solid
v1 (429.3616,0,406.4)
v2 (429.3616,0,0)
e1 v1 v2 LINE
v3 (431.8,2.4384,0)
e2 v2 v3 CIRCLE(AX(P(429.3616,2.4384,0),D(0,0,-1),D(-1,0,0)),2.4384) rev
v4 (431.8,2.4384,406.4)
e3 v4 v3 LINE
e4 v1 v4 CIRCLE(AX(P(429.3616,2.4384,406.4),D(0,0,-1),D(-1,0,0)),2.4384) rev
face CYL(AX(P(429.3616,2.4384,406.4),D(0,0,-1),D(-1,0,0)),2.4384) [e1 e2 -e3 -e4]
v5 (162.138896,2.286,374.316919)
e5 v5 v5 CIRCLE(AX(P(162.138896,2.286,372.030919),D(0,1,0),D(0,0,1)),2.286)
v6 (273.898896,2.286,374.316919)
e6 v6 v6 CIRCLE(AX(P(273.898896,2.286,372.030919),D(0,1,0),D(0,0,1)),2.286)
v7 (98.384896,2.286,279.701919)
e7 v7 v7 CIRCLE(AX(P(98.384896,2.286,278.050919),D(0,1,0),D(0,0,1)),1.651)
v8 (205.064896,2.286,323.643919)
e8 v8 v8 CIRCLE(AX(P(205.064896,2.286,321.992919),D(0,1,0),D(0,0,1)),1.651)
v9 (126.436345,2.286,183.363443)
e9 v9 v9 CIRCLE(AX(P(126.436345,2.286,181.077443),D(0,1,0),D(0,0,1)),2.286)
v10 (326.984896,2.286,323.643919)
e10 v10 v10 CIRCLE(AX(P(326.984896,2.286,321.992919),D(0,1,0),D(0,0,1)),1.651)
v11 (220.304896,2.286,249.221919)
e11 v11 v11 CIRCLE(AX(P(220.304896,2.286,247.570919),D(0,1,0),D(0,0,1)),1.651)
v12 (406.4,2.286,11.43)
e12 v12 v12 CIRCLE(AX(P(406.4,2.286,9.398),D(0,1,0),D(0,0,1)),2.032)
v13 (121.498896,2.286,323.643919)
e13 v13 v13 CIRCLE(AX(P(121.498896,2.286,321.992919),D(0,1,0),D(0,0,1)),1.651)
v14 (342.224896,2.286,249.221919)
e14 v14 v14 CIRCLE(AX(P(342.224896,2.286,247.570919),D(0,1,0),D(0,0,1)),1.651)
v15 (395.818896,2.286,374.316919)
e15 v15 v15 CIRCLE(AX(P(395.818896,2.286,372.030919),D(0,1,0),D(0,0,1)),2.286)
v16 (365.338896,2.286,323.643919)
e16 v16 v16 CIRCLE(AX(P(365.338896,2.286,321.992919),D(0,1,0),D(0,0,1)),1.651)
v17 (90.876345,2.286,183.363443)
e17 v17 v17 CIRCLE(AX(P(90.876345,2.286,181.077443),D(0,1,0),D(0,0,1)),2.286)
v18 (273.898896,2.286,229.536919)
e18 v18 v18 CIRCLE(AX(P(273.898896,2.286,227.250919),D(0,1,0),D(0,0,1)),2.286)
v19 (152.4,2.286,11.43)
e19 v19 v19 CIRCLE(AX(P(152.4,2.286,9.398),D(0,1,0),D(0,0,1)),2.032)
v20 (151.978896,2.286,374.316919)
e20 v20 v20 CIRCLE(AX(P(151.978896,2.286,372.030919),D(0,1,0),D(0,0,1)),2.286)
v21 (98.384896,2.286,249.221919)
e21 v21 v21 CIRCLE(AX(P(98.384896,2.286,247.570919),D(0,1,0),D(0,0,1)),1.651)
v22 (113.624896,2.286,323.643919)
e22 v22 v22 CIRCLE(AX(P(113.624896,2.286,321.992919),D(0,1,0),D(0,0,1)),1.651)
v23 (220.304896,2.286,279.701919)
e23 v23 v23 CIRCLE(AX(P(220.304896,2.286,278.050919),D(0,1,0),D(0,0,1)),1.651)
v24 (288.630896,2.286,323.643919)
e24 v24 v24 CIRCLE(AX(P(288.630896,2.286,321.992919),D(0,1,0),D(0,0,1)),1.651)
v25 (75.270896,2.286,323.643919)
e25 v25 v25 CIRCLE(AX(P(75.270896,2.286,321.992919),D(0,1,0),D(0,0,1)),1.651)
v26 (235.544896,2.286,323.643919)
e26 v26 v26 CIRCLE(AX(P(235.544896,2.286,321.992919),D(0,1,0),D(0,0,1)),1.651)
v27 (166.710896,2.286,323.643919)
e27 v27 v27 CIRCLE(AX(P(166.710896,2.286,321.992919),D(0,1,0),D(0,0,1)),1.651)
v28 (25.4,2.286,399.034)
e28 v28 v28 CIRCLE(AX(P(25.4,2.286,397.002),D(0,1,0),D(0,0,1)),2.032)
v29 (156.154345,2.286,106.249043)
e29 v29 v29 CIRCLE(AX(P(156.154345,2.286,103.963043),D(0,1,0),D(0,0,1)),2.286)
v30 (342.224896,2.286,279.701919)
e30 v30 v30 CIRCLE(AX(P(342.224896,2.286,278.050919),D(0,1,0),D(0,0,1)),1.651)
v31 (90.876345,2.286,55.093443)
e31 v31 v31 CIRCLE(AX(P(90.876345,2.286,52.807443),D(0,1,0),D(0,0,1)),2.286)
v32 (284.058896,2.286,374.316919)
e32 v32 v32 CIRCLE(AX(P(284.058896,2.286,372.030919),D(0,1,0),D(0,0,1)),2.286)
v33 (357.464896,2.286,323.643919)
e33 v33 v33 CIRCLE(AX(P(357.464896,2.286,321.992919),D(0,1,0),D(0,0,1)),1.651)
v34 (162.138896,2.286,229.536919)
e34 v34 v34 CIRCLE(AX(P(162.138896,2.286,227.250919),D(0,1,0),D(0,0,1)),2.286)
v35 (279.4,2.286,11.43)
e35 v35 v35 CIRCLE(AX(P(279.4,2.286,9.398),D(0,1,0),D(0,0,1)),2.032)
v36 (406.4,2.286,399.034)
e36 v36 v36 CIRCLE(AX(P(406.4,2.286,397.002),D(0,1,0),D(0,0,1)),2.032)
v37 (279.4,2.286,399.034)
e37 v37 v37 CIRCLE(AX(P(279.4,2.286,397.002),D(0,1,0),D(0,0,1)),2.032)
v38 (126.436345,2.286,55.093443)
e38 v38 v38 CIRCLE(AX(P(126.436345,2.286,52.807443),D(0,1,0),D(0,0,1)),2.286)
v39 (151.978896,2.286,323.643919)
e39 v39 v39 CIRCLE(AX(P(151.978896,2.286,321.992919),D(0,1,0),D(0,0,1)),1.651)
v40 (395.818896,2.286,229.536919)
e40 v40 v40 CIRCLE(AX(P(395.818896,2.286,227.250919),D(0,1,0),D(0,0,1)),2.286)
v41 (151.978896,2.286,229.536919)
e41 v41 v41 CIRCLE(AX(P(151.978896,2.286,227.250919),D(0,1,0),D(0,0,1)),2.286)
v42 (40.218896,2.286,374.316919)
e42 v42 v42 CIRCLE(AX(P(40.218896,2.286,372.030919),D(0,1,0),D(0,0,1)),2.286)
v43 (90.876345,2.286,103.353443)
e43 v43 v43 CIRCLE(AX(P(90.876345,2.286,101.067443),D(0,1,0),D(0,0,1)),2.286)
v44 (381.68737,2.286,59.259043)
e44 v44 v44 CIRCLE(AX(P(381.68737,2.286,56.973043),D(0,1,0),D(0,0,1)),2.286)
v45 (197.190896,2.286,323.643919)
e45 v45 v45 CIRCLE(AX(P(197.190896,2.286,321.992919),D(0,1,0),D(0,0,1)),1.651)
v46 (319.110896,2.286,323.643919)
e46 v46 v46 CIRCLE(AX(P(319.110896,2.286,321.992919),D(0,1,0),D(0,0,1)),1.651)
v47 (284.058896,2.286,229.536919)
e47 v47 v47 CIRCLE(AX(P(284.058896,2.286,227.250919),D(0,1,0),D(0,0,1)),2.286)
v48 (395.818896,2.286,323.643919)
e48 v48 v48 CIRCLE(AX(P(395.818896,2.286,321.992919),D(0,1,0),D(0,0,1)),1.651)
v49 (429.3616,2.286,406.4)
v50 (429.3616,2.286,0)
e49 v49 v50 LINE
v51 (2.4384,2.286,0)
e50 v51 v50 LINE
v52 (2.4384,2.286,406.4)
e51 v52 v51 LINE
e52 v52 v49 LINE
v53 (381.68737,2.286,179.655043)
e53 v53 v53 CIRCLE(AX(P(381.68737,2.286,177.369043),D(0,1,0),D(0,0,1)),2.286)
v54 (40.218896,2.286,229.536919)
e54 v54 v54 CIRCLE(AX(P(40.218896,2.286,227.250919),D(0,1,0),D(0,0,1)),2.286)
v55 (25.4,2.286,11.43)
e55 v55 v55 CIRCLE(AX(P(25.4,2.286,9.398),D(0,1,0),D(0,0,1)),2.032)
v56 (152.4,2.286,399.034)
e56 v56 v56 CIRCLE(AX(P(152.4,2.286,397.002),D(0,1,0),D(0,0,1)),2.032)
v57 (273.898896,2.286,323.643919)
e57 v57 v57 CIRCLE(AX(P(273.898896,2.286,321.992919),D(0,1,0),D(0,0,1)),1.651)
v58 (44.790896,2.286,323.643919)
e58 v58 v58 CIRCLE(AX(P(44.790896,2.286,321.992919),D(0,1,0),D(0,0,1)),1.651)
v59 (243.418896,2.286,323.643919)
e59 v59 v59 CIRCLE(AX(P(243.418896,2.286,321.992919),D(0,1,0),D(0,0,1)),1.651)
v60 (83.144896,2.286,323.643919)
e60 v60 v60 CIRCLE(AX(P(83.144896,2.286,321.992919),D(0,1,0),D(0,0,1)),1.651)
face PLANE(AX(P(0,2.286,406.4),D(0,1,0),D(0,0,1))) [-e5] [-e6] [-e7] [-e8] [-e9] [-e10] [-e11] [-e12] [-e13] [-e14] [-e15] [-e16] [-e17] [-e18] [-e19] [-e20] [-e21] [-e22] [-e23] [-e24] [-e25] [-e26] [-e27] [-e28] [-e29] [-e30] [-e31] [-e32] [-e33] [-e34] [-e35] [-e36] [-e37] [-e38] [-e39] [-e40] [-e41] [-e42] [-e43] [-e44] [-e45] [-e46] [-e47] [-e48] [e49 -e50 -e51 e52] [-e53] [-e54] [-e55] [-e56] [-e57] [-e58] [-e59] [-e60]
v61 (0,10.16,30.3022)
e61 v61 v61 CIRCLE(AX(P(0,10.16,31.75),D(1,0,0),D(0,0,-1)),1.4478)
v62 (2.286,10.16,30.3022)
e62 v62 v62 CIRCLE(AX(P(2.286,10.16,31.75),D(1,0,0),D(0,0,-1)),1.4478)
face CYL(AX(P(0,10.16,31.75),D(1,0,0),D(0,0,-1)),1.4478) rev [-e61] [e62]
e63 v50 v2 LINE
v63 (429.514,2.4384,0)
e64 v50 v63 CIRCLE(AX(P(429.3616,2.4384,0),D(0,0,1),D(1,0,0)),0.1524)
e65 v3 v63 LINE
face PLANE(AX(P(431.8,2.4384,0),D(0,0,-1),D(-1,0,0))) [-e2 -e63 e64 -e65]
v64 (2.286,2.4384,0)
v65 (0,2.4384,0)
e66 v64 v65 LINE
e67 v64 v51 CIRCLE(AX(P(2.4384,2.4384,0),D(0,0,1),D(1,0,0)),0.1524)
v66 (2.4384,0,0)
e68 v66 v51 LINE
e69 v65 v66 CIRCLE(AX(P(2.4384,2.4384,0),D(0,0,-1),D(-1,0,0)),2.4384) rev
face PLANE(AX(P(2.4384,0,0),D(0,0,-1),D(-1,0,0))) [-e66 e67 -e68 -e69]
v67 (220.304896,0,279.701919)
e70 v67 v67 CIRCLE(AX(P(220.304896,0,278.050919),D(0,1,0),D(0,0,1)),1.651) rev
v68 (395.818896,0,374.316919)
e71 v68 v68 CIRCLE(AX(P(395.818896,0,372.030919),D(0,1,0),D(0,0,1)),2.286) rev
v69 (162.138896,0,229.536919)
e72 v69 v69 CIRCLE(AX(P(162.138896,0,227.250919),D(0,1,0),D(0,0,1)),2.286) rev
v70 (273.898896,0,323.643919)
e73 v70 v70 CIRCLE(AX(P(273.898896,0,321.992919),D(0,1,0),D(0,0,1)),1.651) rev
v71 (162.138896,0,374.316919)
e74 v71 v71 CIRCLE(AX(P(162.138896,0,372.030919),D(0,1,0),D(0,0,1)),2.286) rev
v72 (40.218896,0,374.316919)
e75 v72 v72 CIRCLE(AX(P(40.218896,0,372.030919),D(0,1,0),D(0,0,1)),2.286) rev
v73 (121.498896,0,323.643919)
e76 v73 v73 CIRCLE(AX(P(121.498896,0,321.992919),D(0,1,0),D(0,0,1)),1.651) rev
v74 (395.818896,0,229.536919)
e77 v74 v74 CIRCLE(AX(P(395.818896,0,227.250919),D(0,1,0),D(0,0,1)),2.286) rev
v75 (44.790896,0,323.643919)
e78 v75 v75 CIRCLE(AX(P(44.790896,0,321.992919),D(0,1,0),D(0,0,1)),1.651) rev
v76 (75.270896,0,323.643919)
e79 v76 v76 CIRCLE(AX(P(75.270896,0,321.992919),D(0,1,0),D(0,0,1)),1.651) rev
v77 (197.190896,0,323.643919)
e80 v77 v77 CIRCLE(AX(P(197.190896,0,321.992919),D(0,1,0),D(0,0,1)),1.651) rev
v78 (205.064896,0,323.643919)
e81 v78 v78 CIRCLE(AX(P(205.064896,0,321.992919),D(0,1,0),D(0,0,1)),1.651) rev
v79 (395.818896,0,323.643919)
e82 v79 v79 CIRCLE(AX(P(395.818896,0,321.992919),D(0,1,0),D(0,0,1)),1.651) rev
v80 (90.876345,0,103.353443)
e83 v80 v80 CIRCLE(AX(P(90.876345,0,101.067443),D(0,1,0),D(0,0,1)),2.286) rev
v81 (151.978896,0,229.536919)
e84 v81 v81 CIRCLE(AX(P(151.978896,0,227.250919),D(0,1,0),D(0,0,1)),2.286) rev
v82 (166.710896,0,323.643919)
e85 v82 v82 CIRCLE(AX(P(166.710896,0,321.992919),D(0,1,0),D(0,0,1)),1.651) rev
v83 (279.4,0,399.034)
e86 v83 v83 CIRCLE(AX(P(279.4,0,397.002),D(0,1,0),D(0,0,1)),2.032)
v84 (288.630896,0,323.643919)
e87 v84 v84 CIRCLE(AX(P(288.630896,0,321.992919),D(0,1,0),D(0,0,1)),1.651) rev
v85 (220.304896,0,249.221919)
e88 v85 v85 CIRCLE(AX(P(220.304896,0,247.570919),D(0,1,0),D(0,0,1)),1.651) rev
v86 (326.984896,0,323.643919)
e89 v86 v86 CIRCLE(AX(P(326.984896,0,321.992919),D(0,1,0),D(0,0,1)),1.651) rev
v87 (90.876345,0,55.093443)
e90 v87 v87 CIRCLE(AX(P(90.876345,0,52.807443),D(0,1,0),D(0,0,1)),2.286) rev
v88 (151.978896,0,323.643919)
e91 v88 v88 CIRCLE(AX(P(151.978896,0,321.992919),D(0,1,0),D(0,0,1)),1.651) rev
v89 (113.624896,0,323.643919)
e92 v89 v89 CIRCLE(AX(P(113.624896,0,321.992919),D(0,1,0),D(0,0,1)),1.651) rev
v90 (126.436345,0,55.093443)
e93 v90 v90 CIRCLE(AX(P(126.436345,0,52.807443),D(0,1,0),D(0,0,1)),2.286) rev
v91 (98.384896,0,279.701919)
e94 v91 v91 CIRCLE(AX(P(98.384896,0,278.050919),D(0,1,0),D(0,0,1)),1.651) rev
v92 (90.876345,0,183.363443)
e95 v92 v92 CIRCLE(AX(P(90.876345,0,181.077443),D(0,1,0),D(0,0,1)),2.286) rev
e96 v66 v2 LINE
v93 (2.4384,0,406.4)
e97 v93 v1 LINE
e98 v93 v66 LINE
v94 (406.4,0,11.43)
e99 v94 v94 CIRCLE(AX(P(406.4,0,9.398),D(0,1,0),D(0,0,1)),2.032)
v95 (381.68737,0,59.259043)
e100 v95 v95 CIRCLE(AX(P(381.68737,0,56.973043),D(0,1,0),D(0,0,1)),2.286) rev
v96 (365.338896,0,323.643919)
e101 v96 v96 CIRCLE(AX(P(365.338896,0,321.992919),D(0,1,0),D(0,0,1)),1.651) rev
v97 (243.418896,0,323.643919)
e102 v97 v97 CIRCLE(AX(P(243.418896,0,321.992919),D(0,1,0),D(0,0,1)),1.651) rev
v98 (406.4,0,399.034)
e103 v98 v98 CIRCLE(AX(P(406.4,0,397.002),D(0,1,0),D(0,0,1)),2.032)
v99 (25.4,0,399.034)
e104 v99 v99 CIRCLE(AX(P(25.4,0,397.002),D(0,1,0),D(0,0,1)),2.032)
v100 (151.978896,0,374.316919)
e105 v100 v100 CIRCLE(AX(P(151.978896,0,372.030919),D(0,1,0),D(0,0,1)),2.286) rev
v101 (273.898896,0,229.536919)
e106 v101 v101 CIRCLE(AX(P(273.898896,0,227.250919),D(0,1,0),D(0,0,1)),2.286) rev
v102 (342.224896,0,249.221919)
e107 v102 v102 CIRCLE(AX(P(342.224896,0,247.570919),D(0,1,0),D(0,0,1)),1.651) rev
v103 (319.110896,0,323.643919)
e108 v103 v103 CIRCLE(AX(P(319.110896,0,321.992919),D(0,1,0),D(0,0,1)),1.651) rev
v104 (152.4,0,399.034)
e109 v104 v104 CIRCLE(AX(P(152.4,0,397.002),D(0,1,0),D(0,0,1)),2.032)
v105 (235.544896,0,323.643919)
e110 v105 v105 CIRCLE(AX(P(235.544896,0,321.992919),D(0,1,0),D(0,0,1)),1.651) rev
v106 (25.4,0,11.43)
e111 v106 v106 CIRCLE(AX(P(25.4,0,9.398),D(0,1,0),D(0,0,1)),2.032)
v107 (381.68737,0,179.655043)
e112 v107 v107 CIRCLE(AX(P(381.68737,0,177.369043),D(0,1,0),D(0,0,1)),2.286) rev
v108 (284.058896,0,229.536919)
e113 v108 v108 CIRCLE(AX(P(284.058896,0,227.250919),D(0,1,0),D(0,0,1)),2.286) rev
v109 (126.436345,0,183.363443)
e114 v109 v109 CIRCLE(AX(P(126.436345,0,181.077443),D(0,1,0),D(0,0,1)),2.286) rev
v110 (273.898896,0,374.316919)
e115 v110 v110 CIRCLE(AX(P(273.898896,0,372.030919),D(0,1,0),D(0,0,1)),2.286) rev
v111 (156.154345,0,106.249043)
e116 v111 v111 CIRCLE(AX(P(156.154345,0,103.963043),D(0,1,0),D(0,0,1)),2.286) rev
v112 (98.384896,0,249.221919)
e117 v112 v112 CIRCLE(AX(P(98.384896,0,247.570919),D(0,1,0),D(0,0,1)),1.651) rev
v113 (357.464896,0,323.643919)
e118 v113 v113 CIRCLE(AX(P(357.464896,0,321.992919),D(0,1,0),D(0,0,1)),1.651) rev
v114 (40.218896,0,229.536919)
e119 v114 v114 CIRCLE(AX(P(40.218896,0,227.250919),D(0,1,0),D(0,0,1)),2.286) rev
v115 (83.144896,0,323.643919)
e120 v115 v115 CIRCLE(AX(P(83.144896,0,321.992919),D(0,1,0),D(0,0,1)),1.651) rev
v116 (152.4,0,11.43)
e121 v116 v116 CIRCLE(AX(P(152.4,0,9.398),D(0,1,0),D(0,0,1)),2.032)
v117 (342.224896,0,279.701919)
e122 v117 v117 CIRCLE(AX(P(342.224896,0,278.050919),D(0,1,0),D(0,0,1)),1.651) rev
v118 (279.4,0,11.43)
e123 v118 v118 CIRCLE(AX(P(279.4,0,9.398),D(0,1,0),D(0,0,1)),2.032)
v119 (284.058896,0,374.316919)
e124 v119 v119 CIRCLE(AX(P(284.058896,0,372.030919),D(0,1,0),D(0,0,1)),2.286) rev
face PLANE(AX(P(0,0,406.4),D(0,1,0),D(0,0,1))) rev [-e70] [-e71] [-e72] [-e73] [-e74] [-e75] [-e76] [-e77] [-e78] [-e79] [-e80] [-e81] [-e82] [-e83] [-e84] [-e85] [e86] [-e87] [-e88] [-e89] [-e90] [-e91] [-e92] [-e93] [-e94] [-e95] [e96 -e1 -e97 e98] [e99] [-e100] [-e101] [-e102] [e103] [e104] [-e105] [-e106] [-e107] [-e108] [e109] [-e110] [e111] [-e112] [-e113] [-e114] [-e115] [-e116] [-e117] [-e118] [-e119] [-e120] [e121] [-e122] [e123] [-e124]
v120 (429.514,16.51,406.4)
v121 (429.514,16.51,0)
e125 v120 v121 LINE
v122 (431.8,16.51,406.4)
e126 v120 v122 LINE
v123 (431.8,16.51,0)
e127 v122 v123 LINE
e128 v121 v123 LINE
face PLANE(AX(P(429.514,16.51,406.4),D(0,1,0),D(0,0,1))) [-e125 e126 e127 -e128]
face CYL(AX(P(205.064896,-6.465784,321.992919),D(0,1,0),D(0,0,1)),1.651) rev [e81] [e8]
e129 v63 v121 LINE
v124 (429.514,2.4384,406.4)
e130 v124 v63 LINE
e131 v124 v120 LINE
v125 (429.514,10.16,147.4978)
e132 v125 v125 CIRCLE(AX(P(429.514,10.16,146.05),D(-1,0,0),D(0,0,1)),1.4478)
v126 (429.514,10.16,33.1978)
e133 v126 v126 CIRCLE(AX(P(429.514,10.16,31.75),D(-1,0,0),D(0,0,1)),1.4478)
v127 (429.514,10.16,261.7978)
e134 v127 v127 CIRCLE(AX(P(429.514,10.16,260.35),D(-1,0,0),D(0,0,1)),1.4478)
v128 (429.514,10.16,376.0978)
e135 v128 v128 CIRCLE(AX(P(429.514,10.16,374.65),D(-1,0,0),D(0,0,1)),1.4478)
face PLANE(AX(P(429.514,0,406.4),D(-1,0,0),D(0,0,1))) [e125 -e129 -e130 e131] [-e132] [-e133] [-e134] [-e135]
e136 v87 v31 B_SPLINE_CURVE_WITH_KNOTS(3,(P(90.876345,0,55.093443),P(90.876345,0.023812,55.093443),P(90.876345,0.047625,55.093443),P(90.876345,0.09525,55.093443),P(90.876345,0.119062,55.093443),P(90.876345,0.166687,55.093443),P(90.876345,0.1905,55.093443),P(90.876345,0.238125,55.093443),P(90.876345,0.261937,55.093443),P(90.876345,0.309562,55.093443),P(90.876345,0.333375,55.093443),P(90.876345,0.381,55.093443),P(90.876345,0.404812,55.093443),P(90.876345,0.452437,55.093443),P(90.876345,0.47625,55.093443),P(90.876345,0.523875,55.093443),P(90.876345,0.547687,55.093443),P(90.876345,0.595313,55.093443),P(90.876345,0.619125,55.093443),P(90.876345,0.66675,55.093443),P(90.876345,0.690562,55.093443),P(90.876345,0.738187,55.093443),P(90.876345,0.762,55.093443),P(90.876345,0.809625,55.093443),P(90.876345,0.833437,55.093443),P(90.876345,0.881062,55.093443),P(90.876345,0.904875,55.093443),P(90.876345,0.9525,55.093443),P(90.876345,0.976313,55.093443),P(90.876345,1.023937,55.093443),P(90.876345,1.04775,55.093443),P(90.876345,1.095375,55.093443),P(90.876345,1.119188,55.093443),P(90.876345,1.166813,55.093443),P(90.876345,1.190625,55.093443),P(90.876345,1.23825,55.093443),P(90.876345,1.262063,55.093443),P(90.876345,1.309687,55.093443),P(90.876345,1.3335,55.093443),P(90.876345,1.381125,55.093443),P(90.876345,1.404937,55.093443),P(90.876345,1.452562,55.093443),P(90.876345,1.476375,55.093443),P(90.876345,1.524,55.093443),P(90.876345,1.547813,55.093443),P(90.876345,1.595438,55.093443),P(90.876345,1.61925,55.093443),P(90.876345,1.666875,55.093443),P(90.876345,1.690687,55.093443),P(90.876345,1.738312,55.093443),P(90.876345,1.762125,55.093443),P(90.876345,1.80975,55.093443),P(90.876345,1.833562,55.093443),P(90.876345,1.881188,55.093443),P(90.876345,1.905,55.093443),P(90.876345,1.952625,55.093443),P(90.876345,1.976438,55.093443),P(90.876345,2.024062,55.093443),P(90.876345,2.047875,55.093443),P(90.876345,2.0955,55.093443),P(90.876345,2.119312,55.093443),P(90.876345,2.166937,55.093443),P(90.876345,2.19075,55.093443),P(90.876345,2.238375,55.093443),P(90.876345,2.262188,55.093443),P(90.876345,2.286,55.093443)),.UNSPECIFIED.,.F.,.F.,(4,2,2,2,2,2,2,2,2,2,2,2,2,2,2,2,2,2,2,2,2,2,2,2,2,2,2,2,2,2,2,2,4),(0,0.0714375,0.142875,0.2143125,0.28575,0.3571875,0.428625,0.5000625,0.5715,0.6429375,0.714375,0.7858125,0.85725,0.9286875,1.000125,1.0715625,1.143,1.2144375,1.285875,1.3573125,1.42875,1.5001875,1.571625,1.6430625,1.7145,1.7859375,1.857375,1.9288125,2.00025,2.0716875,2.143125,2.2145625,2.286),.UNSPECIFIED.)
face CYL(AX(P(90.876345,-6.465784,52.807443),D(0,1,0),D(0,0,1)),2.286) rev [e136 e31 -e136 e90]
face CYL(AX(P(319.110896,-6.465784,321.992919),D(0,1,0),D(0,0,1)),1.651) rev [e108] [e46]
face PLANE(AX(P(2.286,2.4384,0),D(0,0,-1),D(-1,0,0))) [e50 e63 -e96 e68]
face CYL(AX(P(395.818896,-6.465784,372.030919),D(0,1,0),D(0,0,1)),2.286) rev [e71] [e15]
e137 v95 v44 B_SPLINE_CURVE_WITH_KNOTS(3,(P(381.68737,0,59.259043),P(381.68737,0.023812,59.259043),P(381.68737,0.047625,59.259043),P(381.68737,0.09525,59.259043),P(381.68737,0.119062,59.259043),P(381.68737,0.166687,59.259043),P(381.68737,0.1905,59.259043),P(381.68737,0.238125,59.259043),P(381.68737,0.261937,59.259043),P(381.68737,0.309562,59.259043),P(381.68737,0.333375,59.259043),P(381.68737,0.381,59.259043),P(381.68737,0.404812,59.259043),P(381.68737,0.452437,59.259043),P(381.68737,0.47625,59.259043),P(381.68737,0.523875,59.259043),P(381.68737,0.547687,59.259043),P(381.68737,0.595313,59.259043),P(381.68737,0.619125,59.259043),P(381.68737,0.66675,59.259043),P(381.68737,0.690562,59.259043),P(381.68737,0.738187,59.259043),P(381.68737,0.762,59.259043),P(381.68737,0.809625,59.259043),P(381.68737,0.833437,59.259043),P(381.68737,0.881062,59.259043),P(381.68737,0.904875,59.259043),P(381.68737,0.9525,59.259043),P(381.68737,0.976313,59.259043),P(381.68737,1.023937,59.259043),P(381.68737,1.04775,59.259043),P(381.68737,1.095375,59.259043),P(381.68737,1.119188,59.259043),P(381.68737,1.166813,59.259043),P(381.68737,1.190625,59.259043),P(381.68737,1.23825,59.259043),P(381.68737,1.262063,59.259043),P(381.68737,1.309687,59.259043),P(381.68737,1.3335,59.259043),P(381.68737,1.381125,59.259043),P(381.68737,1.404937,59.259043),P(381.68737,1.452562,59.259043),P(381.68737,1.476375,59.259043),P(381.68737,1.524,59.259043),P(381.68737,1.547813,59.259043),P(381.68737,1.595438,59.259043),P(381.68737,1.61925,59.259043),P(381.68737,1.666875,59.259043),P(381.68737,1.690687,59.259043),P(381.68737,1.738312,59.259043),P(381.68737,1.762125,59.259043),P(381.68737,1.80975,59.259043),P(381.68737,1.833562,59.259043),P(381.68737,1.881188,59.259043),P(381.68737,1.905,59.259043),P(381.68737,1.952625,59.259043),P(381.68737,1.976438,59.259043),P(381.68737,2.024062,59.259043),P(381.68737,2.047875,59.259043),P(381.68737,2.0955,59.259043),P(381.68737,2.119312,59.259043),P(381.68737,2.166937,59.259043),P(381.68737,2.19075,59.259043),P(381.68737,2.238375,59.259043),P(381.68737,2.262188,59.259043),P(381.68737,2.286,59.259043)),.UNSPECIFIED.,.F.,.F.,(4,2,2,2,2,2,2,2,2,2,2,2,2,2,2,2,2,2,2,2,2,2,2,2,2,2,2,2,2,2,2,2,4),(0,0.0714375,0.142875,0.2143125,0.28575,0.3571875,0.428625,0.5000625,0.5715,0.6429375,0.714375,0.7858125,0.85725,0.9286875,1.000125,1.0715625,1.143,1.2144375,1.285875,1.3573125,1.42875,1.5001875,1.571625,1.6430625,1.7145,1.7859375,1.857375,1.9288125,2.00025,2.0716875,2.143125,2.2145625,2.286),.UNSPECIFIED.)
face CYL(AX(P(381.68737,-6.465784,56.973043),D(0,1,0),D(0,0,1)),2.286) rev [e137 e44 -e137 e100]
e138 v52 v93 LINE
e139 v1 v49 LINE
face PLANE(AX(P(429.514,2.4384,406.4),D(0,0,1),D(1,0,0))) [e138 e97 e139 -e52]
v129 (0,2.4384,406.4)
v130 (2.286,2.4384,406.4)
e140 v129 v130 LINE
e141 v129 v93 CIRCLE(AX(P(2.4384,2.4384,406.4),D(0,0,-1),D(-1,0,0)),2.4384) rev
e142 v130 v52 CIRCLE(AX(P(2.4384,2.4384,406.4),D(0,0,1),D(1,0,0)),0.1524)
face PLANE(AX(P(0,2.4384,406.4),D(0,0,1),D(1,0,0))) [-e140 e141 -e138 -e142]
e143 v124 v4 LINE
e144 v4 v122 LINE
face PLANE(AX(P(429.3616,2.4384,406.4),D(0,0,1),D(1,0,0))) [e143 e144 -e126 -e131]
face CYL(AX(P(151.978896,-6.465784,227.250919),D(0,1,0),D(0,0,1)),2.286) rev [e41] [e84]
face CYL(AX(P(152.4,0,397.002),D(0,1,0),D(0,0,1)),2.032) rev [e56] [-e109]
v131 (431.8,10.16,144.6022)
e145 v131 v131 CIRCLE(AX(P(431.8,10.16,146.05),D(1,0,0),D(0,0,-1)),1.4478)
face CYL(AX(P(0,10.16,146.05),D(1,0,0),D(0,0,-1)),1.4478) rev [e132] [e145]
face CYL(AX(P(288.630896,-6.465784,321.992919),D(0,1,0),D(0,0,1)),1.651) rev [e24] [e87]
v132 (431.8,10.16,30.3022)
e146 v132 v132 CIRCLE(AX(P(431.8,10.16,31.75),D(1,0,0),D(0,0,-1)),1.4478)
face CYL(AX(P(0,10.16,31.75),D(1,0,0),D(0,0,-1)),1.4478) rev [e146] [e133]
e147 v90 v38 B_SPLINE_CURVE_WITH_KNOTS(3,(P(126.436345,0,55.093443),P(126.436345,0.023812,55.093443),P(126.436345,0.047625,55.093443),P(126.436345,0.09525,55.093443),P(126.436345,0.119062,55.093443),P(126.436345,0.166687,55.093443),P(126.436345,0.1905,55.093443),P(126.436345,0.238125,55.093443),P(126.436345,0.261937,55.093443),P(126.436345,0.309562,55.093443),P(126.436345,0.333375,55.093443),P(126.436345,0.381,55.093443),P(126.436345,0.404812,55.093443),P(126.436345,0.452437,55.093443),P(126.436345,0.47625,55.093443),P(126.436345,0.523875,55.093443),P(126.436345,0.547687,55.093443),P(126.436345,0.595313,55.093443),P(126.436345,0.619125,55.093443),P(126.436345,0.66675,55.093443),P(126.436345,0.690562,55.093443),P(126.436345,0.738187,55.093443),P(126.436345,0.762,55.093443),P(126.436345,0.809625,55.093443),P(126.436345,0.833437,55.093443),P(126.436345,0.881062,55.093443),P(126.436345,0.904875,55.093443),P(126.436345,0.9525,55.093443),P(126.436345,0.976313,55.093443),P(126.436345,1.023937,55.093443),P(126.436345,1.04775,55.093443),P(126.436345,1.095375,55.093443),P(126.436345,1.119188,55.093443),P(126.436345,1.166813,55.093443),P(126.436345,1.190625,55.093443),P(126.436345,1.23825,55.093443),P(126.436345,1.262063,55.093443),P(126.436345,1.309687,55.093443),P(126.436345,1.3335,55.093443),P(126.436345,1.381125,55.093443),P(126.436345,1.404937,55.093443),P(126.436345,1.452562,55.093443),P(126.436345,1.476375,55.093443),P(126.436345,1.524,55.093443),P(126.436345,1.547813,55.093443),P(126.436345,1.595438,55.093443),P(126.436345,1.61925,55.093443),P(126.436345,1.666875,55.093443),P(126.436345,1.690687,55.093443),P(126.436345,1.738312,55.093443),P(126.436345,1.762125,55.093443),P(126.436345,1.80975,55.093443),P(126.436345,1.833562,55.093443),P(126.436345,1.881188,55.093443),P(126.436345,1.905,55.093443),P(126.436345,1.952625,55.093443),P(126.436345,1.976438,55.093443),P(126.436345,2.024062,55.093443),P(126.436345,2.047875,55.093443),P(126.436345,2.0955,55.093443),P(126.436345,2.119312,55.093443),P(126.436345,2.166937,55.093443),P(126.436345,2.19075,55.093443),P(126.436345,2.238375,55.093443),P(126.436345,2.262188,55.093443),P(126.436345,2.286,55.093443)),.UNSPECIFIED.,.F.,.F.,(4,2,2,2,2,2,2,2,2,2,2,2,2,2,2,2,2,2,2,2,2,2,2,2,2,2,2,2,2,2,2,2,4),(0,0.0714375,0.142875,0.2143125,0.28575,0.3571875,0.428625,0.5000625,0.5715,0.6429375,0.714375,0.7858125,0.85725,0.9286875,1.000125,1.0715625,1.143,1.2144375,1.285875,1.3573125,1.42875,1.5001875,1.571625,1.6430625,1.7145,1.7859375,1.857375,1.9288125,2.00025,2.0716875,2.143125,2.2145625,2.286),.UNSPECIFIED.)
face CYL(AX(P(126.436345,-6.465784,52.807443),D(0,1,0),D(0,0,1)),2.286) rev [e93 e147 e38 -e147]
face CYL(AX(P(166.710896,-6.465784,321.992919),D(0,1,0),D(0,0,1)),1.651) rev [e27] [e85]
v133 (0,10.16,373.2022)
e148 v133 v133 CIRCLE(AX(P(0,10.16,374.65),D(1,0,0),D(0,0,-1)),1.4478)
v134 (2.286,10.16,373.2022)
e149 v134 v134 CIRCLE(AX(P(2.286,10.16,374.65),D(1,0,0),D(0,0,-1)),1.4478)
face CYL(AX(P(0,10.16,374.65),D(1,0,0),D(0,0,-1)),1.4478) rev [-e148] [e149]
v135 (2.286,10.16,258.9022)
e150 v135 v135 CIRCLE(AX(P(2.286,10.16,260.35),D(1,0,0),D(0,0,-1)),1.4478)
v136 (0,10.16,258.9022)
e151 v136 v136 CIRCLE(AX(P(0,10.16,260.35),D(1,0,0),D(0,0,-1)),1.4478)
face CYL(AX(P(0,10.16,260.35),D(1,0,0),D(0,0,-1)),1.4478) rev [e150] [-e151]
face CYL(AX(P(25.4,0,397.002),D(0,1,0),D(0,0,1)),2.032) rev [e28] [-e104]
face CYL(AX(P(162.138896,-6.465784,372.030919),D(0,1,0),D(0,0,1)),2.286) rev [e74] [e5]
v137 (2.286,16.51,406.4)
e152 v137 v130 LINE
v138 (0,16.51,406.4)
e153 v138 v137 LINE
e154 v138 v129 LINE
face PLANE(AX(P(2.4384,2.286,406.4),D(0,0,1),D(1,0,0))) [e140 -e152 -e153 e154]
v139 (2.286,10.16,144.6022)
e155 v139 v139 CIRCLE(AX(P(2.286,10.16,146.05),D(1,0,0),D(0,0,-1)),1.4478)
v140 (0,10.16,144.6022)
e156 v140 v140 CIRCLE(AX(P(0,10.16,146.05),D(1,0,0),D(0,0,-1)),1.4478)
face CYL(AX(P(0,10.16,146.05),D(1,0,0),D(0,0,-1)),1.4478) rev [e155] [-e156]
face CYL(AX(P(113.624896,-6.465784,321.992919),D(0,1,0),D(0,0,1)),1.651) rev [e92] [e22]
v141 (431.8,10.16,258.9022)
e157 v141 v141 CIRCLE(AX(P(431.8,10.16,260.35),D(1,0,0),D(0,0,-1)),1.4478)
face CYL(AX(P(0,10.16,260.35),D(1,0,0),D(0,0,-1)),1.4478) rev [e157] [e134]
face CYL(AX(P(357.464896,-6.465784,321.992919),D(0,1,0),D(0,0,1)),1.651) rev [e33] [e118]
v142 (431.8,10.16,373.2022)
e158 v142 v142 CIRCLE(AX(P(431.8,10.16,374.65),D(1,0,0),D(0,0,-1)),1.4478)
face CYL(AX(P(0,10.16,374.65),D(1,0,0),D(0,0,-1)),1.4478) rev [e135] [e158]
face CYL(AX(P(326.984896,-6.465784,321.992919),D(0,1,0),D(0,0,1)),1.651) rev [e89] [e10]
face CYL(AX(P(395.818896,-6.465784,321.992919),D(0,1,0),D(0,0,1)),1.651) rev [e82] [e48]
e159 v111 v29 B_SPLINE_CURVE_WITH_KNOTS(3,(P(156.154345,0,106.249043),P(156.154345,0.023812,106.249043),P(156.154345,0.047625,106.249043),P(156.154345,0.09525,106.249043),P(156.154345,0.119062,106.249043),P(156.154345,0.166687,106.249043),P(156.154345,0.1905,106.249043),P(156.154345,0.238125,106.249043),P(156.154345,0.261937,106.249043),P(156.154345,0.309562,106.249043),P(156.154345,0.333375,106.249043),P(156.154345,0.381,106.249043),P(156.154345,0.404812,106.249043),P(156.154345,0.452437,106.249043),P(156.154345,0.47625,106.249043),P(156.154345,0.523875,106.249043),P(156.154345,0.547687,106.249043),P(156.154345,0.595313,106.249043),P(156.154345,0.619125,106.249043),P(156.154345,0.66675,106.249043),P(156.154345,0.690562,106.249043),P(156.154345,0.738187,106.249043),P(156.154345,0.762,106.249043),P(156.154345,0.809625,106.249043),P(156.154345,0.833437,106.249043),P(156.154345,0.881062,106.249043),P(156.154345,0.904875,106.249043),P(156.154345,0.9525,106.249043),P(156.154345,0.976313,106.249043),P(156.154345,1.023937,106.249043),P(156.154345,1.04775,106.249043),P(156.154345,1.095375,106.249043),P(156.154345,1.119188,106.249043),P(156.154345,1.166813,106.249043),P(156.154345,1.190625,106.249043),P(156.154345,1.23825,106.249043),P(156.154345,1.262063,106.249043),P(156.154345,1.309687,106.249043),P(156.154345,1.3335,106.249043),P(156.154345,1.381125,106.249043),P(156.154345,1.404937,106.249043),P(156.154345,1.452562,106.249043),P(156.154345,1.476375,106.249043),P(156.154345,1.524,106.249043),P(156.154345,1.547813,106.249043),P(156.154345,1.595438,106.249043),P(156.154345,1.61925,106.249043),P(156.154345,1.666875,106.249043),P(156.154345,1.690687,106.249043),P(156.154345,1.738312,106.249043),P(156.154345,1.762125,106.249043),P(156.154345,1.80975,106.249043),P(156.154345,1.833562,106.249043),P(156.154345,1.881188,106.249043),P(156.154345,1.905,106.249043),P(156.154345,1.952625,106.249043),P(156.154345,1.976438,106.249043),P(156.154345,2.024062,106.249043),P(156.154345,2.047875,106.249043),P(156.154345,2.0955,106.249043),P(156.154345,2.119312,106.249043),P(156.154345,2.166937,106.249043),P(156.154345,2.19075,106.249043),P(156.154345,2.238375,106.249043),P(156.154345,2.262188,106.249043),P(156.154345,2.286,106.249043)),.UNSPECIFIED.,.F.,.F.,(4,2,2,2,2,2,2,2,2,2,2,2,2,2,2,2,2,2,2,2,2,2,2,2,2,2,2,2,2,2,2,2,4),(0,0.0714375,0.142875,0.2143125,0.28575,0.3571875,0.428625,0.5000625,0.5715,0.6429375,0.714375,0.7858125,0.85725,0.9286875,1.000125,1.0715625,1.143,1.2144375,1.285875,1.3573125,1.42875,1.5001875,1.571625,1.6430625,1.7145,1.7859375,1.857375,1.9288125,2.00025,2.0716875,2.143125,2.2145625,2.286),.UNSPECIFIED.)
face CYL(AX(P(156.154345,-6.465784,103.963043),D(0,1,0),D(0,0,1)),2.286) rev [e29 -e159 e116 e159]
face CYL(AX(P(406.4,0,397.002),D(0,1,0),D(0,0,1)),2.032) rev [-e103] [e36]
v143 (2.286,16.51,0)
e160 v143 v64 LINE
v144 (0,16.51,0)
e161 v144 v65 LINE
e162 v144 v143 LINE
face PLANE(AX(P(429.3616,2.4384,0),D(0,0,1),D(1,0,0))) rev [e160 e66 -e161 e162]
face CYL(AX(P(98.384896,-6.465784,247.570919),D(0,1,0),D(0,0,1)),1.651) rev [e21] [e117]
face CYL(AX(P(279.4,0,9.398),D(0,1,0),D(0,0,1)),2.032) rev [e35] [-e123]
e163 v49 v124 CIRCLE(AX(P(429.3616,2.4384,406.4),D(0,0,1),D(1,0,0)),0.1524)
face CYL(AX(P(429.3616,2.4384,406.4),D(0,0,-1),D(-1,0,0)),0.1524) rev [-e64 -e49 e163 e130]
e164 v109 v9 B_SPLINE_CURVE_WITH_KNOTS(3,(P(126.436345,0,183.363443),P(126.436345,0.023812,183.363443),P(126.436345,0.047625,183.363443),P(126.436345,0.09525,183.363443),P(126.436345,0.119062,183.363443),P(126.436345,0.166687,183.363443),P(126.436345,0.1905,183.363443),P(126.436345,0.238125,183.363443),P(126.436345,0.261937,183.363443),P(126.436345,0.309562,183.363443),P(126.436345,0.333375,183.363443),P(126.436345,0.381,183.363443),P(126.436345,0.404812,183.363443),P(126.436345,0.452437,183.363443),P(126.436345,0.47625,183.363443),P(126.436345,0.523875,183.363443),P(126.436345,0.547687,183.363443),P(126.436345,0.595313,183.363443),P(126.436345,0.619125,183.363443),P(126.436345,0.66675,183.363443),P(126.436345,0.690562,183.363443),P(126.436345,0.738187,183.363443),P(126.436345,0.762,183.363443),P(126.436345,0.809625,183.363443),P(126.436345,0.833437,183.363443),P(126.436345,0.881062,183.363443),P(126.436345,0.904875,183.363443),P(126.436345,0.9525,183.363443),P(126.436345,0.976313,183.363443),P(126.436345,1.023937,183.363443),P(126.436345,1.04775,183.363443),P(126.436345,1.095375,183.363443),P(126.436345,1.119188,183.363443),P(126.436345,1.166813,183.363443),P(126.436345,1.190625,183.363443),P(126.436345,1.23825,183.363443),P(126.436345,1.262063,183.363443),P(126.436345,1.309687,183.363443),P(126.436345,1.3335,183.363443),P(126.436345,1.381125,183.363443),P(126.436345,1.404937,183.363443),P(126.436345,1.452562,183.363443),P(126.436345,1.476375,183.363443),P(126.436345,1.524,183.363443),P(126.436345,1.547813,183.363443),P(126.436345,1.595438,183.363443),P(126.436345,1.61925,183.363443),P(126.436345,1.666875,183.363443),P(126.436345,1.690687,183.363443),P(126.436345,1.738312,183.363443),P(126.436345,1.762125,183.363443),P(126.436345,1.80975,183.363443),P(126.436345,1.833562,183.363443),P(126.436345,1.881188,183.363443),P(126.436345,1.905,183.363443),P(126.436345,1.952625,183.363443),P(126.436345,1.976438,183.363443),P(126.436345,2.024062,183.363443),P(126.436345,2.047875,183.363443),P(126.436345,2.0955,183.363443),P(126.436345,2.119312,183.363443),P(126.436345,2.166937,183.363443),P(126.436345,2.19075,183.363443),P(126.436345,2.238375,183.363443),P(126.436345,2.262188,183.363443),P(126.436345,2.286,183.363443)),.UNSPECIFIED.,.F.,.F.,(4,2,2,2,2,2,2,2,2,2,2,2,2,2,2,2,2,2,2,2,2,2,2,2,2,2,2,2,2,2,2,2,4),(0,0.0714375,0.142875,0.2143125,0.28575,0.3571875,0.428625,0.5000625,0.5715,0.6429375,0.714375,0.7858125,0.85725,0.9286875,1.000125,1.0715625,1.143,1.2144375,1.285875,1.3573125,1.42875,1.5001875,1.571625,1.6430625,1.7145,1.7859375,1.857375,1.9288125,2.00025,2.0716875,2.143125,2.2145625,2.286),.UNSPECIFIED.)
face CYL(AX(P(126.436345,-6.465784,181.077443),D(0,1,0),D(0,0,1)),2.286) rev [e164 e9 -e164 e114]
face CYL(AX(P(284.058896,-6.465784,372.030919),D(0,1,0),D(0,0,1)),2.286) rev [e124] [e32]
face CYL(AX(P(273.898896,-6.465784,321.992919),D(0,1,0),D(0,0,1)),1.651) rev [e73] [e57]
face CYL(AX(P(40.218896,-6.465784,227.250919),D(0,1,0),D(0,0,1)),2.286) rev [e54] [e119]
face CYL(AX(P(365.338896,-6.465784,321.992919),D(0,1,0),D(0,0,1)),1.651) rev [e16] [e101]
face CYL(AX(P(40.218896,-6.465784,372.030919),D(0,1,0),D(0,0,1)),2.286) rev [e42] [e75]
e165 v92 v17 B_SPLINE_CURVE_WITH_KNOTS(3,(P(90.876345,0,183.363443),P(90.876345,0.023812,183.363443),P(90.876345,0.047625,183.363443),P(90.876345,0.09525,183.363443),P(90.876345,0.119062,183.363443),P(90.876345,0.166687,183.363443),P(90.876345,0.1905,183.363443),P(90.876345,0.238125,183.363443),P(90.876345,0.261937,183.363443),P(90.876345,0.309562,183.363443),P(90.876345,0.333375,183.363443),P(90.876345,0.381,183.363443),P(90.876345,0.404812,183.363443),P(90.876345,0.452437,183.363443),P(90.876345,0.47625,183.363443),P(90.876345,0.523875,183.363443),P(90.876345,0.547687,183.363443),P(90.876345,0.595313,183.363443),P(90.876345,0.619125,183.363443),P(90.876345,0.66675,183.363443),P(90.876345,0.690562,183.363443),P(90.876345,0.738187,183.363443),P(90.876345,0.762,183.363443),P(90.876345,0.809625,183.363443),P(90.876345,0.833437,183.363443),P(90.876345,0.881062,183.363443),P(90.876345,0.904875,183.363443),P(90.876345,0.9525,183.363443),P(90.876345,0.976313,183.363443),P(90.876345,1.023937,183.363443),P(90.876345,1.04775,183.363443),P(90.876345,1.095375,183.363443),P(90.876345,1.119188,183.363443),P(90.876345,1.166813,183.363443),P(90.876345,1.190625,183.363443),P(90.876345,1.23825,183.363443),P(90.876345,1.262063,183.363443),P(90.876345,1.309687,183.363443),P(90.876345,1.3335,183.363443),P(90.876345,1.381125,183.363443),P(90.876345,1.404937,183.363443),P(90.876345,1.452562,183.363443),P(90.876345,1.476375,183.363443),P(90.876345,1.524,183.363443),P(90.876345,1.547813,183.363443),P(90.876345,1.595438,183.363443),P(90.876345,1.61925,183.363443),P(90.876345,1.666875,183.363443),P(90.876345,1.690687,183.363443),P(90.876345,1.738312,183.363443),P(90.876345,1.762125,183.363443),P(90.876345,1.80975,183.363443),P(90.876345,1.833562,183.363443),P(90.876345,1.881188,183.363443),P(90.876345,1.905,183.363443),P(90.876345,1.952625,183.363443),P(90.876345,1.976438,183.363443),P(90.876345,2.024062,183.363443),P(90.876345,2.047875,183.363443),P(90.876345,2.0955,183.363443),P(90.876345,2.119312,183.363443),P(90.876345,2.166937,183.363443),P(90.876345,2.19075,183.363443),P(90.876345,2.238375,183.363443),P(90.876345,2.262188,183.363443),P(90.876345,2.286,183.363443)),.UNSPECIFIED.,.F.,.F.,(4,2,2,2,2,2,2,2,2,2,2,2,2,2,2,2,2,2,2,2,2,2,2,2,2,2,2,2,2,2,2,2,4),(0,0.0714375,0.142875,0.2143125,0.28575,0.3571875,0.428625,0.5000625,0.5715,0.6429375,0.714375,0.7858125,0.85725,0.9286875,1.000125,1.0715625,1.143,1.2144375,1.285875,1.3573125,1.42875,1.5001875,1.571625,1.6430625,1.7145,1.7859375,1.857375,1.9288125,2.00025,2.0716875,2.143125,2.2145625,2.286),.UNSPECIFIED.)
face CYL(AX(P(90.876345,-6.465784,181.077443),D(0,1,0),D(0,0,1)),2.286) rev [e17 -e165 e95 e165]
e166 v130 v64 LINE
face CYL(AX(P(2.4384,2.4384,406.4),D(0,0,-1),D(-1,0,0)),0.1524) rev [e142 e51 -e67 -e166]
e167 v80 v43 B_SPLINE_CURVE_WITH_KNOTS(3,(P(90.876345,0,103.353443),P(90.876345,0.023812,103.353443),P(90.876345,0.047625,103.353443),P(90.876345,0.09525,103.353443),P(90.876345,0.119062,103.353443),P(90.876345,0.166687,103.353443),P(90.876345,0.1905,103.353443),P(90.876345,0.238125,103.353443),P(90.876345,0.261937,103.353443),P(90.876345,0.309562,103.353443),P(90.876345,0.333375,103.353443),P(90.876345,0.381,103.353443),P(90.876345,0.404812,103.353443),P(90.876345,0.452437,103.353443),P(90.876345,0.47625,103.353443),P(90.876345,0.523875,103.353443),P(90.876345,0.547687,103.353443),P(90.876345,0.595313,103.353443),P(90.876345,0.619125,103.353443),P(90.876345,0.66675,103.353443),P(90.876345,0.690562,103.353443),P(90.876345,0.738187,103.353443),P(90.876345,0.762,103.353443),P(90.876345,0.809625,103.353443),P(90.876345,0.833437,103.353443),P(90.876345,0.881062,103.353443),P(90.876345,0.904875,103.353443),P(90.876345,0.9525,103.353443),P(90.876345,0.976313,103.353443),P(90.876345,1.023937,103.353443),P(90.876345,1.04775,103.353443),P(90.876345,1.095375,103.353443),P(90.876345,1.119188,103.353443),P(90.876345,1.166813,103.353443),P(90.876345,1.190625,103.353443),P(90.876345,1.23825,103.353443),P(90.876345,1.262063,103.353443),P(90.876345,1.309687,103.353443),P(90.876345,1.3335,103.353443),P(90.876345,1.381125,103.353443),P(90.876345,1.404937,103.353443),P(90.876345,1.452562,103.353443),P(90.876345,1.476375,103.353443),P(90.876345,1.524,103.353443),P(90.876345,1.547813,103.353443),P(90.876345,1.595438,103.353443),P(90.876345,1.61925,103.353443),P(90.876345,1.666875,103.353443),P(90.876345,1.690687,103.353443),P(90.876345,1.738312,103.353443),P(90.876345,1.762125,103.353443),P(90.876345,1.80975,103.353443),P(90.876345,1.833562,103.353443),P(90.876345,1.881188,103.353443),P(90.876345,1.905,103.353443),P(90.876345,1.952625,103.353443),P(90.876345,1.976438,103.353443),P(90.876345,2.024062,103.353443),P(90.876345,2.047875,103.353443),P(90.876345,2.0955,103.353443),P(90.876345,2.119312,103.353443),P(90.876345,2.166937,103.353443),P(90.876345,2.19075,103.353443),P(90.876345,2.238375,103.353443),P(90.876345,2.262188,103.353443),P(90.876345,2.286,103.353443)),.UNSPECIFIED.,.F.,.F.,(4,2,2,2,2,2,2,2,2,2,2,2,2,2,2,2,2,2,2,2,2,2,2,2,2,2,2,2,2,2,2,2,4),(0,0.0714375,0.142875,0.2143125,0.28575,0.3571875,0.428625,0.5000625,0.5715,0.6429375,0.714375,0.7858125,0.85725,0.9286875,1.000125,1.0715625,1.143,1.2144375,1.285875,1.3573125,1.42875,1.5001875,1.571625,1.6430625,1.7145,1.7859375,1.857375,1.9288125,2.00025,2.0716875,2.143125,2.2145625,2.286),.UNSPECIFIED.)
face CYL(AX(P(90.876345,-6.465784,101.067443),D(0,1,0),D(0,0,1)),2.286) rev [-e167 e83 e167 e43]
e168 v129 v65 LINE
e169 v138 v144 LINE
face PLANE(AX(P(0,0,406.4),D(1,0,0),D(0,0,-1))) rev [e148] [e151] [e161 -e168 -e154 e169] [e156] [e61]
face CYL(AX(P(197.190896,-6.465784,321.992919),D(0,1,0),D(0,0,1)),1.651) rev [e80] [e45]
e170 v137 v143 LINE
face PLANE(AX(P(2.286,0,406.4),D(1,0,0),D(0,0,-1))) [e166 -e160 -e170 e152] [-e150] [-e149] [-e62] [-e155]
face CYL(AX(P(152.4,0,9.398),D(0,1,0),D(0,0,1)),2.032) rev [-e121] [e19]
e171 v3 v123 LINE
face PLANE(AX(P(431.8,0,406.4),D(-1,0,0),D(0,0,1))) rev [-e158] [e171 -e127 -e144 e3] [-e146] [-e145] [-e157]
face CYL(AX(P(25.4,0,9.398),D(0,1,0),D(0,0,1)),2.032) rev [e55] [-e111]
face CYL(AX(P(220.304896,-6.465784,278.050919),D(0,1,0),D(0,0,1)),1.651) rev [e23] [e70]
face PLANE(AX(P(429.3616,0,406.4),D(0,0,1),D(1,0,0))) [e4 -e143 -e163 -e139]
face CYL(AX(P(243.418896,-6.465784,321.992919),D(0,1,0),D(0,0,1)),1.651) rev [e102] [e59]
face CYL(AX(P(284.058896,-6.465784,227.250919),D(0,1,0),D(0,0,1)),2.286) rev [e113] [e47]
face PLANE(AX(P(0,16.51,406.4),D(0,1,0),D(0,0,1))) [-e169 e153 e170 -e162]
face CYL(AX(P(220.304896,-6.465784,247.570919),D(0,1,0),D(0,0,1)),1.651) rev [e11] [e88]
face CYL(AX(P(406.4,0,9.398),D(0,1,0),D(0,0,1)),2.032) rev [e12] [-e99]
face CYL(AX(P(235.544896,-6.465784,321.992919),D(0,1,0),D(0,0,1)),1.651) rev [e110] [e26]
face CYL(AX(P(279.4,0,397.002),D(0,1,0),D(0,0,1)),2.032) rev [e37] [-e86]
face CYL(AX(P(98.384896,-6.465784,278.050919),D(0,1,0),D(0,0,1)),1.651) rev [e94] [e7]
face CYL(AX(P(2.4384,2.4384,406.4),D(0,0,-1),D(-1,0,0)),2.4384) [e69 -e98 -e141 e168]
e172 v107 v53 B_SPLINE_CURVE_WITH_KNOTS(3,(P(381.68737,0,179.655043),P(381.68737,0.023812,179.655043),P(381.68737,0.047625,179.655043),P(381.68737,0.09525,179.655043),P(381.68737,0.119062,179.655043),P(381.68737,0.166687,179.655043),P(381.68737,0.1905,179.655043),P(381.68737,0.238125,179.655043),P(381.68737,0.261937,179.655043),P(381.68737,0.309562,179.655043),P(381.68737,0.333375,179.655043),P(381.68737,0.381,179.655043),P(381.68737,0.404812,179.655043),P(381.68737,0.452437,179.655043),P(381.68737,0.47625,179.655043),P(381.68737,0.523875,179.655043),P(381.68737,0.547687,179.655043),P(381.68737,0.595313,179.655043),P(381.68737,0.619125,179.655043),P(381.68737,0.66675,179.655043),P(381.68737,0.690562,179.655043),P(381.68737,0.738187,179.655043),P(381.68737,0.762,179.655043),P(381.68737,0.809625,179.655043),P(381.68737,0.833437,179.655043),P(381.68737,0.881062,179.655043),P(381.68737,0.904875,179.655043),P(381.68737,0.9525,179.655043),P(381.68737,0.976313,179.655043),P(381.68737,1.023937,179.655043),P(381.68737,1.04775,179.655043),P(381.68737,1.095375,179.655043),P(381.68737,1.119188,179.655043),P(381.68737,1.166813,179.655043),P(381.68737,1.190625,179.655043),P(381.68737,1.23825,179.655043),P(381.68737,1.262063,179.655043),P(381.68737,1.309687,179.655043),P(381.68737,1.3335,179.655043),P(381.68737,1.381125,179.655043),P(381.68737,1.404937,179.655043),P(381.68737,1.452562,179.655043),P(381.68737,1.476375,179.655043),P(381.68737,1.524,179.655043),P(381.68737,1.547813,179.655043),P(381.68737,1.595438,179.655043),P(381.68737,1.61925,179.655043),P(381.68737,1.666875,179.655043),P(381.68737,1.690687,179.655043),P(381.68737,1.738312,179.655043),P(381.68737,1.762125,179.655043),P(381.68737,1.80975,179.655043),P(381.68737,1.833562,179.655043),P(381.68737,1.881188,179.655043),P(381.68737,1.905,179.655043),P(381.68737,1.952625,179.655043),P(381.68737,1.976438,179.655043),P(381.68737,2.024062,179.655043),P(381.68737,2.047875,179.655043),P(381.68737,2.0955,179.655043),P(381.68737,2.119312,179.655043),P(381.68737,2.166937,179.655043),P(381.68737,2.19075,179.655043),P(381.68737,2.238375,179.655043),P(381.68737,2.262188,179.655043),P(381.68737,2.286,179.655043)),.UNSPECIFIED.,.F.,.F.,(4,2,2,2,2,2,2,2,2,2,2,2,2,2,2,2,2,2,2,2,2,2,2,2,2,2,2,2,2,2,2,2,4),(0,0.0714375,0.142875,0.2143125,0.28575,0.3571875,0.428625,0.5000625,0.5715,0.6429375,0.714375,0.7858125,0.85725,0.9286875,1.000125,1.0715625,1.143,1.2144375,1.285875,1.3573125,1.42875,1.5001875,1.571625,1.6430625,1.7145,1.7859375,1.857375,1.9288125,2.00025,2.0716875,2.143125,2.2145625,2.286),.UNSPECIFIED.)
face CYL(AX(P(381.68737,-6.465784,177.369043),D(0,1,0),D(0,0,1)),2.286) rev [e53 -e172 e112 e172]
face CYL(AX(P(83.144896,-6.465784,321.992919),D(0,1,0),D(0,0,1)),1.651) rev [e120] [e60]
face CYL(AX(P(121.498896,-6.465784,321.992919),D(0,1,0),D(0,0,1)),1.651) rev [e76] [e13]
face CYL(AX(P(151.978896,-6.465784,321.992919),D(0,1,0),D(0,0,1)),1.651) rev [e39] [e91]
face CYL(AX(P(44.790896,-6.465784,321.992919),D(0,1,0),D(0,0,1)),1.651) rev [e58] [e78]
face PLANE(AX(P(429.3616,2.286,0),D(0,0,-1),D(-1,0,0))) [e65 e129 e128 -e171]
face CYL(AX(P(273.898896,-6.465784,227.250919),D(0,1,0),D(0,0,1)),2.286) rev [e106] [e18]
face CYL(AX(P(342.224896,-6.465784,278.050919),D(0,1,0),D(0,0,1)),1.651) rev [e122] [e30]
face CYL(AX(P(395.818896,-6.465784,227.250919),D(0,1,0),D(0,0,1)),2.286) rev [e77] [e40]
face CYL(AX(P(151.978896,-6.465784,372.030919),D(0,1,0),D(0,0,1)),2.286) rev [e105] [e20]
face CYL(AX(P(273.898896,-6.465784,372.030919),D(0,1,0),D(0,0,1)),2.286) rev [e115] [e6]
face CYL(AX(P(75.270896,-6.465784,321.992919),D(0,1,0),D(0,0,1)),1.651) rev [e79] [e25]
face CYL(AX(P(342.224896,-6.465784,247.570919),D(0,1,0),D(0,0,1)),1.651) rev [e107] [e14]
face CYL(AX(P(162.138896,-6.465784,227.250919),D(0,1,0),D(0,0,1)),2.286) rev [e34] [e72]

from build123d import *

# Parameters (mm, degrees)
BASE_FLANGE3_DEPTH  = 406.4
SKETCH10_R          = 1.4478
CUT_EXTRUDE3_DEPTH  = 594.198769469
SKETCH11_R          = 2.032
CUT_EXTRUDE4_DEPTH  = 594.139546967
CUT_EXTRUDE10_START = 2.286
SKETCH13_R          = 1.651
SKETCH13_R_2        = 2.286
CUT_EXTRUDE10_DEPTH = 2.286
SKETCH14_R          = 2.286
CUT_EXTRUDE11_DEPTH = 2.286


# Sheet-metal steps are written as plain solids
with BuildPart() as part:
    # Sketch1 → Base-Flange3 (new body)
    with BuildSketch(Plane.XY):
        with BuildLine():
            Line((431.8, 16.51), (431.8, 2.4384))
            ThreePointArc((431.8, 2.4384), (431.085809175, 0.714190825), (429.3616, 0))
            Line((429.3616, 0), (2.4384, 0))
            ThreePointArc((2.4384, 0), (0.714190825, 0.714190825), (0, 2.4384))
            Line((0, 2.4384), (0, 16.51))
            Line((0, 16.51), (2.286, 16.51))
            Line((2.286, 16.51), (2.286, 2.4384))
            ThreePointArc((2.286, 2.4384), (2.330636927, 2.330636927), (2.4384, 2.286))
            Line((2.4384, 2.286), (429.3616, 2.286))
            ThreePointArc((429.3616, 2.286), (429.469363073, 2.330636927), (429.514, 2.4384))
            Line((429.514, 2.4384), (429.514, 16.51))
            Line((429.514, 16.51), (431.8, 16.51))
        make_face()
    extrude(amount=BASE_FLANGE3_DEPTH)

    # Sketch10 → Cut-Extrude3 (cut, through all)
    with BuildSketch(Plane(origin=(431.8, 0, 0), x_dir=(0, 0, -1), z_dir=(1, 0, 0))):
        with Locations((-31.75, 10.16)):
            Circle(SKETCH10_R)
        with Locations((-146.05, 10.16)):
            Circle(SKETCH10_R)
        with Locations((-260.35, 10.16)):
            Circle(SKETCH10_R)
        with Locations((-374.65, 10.16)):
            Circle(SKETCH10_R)
    extrude(amount=-CUT_EXTRUDE3_DEPTH, mode=Mode.SUBTRACT)

    # Sketch11 → Cut-Extrude4 (cut, through all)
    with BuildSketch(Plane(origin=(0, 2.286, 0), x_dir=(-1, 0, 0), z_dir=(0, 1, 0))):
        with Locations(Location((-406.4, 397.002, 0), (0, 0, 90))):
            Circle(SKETCH11_R)
        with Locations(Location((-279.4, 397.002, 0), (0, 0, 90))):
            Circle(SKETCH11_R)
        with Locations(Location((-152.4, 397.002, 0), (0, 0, 90))):
            Circle(SKETCH11_R)
        with Locations(Location((-25.4, 397.002, 0), (0, 0, 90))):
            Circle(SKETCH11_R)
        with Locations(Location((-406.4, 9.398, 0), (0, 0, 90))):
            Circle(SKETCH11_R)
        with Locations(Location((-279.4, 9.398, 0), (0, 0, 90))):
            Circle(SKETCH11_R)
        with Locations(Location((-152.4, 9.398, 0), (0, 0, 90))):
            Circle(SKETCH11_R)
        with Locations(Location((-25.4, 9.398, 0), (0, 0, 90))):
            Circle(SKETCH11_R)
    extrude(amount=-CUT_EXTRUDE4_DEPTH, mode=Mode.SUBTRACT)

    # Sketch13 → Cut-Extrude10 (cut)
    with BuildSketch(Plane(origin=(13.91994535, 0, 411.979952645), x_dir=(0, 0, -1), z_dir=(0, 1, 0)).offset(CUT_EXTRUDE10_START)):
        with Locations(Location((89.98703359, -313.064950531, 0), (0, 0, 180))):
            Circle(SKETCH13_R)
        with Locations(Location((89.98703359, -343.544950531, 0), (0, 0, 180))):
            Circle(SKETCH13_R)
        with Locations(Location((89.98703359, -274.710950531, 0), (0, 0, 180))):
            Circle(SKETCH13_R)
        with Locations(Location((89.98703359, -305.190950531, 0), (0, 0, 180))):
            Circle(SKETCH13_R)
        with Locations(Location((89.98703359, -351.418950531, 0), (0, 0, 180))):
            Circle(SKETCH13_R)
        with Locations(Location((89.98703359, -381.898950531, 0), (0, 0, 180))):
            Circle(SKETCH13_R)
        with Locations(Location((133.92903359, -328.304950531, 0), (0, 0, 180))):
            Circle(SKETCH13_R)
        with Locations(Location((164.40903359, -328.304950531, 0), (0, 0, 180))):
            Circle(SKETCH13_R)
        with Locations(Location((39.94903359, -381.898950531, 0), (0, 0, 180))):
            Circle(SKETCH13_R_2)
        with Locations(Location((184.72903359, -381.898950531, 0), (0, 0, 180))):
            Circle(SKETCH13_R_2)
        with Locations(Location((39.94903359, -270.138950531, 0), (0, 0, 180))):
            Circle(SKETCH13_R_2)
        with Locations(Location((184.72903359, -270.138950531, 0), (0, 0, 180))):
            Circle(SKETCH13_R_2)
        with Locations(Location((89.98703359, -191.144950531, 0), (0, 0, 180))):
            Circle(SKETCH13_R)
        with Locations(Location((89.98703359, -221.624950531, 0), (0, 0, 180))):
            Circle(SKETCH13_R)
        with Locations(Location((89.98703359, -152.790950531, 0), (0, 0, 180))):
            Circle(SKETCH13_R)
        with Locations(Location((89.98703359, -183.270950531, 0), (0, 0, 180))):
            Circle(SKETCH13_R)
        with Locations(Location((89.98703359, -229.498950531, 0), (0, 0, 180))):
            Circle(SKETCH13_R)
        with Locations(Location((89.98703359, -259.978950531, 0), (0, 0, 180))):
            Circle(SKETCH13_R)
        with Locations(Location((133.92903359, -206.384950531, 0), (0, 0, 180))):
            Circle(SKETCH13_R)
        with Locations(Location((164.40903359, -206.384950531, 0), (0, 0, 180))):
            Circle(SKETCH13_R)
        with Locations(Location((39.94903359, -259.978950531, 0), (0, 0, 180))):
            Circle(SKETCH13_R_2)
        with Locations(Location((184.72903359, -259.978950531, 0), (0, 0, 180))):
            Circle(SKETCH13_R_2)
        with Locations(Location((39.94903359, -148.218950531, 0), (0, 0, 180))):
            Circle(SKETCH13_R_2)
        with Locations(Location((184.72903359, -148.218950531, 0), (0, 0, 180))):
            Circle(SKETCH13_R_2)
        with Locations(Location((89.98703359, -69.224950531, 0), (0, 0, 180))):
            Circle(SKETCH13_R)
        with Locations(Location((89.98703359, -99.704950531, 0), (0, 0, 180))):
            Circle(SKETCH13_R)
        with Locations(Location((89.98703359, -30.870950531, 0), (0, 0, 180))):
            Circle(SKETCH13_R)
        with Locations(Location((89.98703359, -61.350950531, 0), (0, 0, 180))):
            Circle(SKETCH13_R)
        with Locations(Location((89.98703359, -107.578950531, 0), (0, 0, 180))):
            Circle(SKETCH13_R)
        with Locations(Location((89.98703359, -138.058950531, 0), (0, 0, 180))):
            Circle(SKETCH13_R)
        with Locations(Location((133.92903359, -84.464950531, 0), (0, 0, 180))):
            Circle(SKETCH13_R)
        with Locations(Location((164.40903359, -84.464950531, 0), (0, 0, 180))):
            Circle(SKETCH13_R)
        with Locations(Location((39.94903359, -138.058950531, 0), (0, 0, 180))):
            Circle(SKETCH13_R_2)
        with Locations(Location((184.72903359, -138.058950531, 0), (0, 0, 180))):
            Circle(SKETCH13_R_2)
        with Locations(Location((39.94903359, -26.298950531, 0), (0, 0, 180))):
            Circle(SKETCH13_R_2)
        with Locations(Location((184.72903359, -26.298950531, 0), (0, 0, 180))):
            Circle(SKETCH13_R_2)
    extrude(amount=-CUT_EXTRUDE10_DEPTH, mode=Mode.SUBTRACT)

    # Sketch14 → Cut-Extrude11 (cut)
    with BuildSketch(Plane(origin=(0, 2.286, 0), x_dir=(1, 0, 0), z_dir=(0, 1, 0))):
        with Locations(Location((156.154345185, -103.963043442, 0), (0, 0, 270))):
            Circle(SKETCH14_R)
        with Locations(Location((381.687370192, -56.973043442, 0), (0, 0, 270))):
            Circle(SKETCH14_R)
        with Locations(Location((381.687370192, -177.369043442, 0), (0, 0, 270))):
            Circle(SKETCH14_R)
        with Locations(Location((126.436345185, -181.077443442, 0), (0, 0, 270))):
            Circle(SKETCH14_R)
        with Locations(Location((90.876345185, -181.077443442, 0), (0, 0, 270))):
            Circle(SKETCH14_R)
        with Locations(Location((90.876345185, -101.067443442, 0), (0, 0, 270))):
            Circle(SKETCH14_R)
        with Locations(Location((90.876345185, -52.807443442, 0), (0, 0, 270))):
            Circle(SKETCH14_R)
        with Locations(Location((126.436345185, -52.807443442, 0), (0, 0, 270))):
            Circle(SKETCH14_R)
    extrude(amount=-CUT_EXTRUDE11_DEPTH, mode=Mode.SUBTRACT)


solid = part.part
